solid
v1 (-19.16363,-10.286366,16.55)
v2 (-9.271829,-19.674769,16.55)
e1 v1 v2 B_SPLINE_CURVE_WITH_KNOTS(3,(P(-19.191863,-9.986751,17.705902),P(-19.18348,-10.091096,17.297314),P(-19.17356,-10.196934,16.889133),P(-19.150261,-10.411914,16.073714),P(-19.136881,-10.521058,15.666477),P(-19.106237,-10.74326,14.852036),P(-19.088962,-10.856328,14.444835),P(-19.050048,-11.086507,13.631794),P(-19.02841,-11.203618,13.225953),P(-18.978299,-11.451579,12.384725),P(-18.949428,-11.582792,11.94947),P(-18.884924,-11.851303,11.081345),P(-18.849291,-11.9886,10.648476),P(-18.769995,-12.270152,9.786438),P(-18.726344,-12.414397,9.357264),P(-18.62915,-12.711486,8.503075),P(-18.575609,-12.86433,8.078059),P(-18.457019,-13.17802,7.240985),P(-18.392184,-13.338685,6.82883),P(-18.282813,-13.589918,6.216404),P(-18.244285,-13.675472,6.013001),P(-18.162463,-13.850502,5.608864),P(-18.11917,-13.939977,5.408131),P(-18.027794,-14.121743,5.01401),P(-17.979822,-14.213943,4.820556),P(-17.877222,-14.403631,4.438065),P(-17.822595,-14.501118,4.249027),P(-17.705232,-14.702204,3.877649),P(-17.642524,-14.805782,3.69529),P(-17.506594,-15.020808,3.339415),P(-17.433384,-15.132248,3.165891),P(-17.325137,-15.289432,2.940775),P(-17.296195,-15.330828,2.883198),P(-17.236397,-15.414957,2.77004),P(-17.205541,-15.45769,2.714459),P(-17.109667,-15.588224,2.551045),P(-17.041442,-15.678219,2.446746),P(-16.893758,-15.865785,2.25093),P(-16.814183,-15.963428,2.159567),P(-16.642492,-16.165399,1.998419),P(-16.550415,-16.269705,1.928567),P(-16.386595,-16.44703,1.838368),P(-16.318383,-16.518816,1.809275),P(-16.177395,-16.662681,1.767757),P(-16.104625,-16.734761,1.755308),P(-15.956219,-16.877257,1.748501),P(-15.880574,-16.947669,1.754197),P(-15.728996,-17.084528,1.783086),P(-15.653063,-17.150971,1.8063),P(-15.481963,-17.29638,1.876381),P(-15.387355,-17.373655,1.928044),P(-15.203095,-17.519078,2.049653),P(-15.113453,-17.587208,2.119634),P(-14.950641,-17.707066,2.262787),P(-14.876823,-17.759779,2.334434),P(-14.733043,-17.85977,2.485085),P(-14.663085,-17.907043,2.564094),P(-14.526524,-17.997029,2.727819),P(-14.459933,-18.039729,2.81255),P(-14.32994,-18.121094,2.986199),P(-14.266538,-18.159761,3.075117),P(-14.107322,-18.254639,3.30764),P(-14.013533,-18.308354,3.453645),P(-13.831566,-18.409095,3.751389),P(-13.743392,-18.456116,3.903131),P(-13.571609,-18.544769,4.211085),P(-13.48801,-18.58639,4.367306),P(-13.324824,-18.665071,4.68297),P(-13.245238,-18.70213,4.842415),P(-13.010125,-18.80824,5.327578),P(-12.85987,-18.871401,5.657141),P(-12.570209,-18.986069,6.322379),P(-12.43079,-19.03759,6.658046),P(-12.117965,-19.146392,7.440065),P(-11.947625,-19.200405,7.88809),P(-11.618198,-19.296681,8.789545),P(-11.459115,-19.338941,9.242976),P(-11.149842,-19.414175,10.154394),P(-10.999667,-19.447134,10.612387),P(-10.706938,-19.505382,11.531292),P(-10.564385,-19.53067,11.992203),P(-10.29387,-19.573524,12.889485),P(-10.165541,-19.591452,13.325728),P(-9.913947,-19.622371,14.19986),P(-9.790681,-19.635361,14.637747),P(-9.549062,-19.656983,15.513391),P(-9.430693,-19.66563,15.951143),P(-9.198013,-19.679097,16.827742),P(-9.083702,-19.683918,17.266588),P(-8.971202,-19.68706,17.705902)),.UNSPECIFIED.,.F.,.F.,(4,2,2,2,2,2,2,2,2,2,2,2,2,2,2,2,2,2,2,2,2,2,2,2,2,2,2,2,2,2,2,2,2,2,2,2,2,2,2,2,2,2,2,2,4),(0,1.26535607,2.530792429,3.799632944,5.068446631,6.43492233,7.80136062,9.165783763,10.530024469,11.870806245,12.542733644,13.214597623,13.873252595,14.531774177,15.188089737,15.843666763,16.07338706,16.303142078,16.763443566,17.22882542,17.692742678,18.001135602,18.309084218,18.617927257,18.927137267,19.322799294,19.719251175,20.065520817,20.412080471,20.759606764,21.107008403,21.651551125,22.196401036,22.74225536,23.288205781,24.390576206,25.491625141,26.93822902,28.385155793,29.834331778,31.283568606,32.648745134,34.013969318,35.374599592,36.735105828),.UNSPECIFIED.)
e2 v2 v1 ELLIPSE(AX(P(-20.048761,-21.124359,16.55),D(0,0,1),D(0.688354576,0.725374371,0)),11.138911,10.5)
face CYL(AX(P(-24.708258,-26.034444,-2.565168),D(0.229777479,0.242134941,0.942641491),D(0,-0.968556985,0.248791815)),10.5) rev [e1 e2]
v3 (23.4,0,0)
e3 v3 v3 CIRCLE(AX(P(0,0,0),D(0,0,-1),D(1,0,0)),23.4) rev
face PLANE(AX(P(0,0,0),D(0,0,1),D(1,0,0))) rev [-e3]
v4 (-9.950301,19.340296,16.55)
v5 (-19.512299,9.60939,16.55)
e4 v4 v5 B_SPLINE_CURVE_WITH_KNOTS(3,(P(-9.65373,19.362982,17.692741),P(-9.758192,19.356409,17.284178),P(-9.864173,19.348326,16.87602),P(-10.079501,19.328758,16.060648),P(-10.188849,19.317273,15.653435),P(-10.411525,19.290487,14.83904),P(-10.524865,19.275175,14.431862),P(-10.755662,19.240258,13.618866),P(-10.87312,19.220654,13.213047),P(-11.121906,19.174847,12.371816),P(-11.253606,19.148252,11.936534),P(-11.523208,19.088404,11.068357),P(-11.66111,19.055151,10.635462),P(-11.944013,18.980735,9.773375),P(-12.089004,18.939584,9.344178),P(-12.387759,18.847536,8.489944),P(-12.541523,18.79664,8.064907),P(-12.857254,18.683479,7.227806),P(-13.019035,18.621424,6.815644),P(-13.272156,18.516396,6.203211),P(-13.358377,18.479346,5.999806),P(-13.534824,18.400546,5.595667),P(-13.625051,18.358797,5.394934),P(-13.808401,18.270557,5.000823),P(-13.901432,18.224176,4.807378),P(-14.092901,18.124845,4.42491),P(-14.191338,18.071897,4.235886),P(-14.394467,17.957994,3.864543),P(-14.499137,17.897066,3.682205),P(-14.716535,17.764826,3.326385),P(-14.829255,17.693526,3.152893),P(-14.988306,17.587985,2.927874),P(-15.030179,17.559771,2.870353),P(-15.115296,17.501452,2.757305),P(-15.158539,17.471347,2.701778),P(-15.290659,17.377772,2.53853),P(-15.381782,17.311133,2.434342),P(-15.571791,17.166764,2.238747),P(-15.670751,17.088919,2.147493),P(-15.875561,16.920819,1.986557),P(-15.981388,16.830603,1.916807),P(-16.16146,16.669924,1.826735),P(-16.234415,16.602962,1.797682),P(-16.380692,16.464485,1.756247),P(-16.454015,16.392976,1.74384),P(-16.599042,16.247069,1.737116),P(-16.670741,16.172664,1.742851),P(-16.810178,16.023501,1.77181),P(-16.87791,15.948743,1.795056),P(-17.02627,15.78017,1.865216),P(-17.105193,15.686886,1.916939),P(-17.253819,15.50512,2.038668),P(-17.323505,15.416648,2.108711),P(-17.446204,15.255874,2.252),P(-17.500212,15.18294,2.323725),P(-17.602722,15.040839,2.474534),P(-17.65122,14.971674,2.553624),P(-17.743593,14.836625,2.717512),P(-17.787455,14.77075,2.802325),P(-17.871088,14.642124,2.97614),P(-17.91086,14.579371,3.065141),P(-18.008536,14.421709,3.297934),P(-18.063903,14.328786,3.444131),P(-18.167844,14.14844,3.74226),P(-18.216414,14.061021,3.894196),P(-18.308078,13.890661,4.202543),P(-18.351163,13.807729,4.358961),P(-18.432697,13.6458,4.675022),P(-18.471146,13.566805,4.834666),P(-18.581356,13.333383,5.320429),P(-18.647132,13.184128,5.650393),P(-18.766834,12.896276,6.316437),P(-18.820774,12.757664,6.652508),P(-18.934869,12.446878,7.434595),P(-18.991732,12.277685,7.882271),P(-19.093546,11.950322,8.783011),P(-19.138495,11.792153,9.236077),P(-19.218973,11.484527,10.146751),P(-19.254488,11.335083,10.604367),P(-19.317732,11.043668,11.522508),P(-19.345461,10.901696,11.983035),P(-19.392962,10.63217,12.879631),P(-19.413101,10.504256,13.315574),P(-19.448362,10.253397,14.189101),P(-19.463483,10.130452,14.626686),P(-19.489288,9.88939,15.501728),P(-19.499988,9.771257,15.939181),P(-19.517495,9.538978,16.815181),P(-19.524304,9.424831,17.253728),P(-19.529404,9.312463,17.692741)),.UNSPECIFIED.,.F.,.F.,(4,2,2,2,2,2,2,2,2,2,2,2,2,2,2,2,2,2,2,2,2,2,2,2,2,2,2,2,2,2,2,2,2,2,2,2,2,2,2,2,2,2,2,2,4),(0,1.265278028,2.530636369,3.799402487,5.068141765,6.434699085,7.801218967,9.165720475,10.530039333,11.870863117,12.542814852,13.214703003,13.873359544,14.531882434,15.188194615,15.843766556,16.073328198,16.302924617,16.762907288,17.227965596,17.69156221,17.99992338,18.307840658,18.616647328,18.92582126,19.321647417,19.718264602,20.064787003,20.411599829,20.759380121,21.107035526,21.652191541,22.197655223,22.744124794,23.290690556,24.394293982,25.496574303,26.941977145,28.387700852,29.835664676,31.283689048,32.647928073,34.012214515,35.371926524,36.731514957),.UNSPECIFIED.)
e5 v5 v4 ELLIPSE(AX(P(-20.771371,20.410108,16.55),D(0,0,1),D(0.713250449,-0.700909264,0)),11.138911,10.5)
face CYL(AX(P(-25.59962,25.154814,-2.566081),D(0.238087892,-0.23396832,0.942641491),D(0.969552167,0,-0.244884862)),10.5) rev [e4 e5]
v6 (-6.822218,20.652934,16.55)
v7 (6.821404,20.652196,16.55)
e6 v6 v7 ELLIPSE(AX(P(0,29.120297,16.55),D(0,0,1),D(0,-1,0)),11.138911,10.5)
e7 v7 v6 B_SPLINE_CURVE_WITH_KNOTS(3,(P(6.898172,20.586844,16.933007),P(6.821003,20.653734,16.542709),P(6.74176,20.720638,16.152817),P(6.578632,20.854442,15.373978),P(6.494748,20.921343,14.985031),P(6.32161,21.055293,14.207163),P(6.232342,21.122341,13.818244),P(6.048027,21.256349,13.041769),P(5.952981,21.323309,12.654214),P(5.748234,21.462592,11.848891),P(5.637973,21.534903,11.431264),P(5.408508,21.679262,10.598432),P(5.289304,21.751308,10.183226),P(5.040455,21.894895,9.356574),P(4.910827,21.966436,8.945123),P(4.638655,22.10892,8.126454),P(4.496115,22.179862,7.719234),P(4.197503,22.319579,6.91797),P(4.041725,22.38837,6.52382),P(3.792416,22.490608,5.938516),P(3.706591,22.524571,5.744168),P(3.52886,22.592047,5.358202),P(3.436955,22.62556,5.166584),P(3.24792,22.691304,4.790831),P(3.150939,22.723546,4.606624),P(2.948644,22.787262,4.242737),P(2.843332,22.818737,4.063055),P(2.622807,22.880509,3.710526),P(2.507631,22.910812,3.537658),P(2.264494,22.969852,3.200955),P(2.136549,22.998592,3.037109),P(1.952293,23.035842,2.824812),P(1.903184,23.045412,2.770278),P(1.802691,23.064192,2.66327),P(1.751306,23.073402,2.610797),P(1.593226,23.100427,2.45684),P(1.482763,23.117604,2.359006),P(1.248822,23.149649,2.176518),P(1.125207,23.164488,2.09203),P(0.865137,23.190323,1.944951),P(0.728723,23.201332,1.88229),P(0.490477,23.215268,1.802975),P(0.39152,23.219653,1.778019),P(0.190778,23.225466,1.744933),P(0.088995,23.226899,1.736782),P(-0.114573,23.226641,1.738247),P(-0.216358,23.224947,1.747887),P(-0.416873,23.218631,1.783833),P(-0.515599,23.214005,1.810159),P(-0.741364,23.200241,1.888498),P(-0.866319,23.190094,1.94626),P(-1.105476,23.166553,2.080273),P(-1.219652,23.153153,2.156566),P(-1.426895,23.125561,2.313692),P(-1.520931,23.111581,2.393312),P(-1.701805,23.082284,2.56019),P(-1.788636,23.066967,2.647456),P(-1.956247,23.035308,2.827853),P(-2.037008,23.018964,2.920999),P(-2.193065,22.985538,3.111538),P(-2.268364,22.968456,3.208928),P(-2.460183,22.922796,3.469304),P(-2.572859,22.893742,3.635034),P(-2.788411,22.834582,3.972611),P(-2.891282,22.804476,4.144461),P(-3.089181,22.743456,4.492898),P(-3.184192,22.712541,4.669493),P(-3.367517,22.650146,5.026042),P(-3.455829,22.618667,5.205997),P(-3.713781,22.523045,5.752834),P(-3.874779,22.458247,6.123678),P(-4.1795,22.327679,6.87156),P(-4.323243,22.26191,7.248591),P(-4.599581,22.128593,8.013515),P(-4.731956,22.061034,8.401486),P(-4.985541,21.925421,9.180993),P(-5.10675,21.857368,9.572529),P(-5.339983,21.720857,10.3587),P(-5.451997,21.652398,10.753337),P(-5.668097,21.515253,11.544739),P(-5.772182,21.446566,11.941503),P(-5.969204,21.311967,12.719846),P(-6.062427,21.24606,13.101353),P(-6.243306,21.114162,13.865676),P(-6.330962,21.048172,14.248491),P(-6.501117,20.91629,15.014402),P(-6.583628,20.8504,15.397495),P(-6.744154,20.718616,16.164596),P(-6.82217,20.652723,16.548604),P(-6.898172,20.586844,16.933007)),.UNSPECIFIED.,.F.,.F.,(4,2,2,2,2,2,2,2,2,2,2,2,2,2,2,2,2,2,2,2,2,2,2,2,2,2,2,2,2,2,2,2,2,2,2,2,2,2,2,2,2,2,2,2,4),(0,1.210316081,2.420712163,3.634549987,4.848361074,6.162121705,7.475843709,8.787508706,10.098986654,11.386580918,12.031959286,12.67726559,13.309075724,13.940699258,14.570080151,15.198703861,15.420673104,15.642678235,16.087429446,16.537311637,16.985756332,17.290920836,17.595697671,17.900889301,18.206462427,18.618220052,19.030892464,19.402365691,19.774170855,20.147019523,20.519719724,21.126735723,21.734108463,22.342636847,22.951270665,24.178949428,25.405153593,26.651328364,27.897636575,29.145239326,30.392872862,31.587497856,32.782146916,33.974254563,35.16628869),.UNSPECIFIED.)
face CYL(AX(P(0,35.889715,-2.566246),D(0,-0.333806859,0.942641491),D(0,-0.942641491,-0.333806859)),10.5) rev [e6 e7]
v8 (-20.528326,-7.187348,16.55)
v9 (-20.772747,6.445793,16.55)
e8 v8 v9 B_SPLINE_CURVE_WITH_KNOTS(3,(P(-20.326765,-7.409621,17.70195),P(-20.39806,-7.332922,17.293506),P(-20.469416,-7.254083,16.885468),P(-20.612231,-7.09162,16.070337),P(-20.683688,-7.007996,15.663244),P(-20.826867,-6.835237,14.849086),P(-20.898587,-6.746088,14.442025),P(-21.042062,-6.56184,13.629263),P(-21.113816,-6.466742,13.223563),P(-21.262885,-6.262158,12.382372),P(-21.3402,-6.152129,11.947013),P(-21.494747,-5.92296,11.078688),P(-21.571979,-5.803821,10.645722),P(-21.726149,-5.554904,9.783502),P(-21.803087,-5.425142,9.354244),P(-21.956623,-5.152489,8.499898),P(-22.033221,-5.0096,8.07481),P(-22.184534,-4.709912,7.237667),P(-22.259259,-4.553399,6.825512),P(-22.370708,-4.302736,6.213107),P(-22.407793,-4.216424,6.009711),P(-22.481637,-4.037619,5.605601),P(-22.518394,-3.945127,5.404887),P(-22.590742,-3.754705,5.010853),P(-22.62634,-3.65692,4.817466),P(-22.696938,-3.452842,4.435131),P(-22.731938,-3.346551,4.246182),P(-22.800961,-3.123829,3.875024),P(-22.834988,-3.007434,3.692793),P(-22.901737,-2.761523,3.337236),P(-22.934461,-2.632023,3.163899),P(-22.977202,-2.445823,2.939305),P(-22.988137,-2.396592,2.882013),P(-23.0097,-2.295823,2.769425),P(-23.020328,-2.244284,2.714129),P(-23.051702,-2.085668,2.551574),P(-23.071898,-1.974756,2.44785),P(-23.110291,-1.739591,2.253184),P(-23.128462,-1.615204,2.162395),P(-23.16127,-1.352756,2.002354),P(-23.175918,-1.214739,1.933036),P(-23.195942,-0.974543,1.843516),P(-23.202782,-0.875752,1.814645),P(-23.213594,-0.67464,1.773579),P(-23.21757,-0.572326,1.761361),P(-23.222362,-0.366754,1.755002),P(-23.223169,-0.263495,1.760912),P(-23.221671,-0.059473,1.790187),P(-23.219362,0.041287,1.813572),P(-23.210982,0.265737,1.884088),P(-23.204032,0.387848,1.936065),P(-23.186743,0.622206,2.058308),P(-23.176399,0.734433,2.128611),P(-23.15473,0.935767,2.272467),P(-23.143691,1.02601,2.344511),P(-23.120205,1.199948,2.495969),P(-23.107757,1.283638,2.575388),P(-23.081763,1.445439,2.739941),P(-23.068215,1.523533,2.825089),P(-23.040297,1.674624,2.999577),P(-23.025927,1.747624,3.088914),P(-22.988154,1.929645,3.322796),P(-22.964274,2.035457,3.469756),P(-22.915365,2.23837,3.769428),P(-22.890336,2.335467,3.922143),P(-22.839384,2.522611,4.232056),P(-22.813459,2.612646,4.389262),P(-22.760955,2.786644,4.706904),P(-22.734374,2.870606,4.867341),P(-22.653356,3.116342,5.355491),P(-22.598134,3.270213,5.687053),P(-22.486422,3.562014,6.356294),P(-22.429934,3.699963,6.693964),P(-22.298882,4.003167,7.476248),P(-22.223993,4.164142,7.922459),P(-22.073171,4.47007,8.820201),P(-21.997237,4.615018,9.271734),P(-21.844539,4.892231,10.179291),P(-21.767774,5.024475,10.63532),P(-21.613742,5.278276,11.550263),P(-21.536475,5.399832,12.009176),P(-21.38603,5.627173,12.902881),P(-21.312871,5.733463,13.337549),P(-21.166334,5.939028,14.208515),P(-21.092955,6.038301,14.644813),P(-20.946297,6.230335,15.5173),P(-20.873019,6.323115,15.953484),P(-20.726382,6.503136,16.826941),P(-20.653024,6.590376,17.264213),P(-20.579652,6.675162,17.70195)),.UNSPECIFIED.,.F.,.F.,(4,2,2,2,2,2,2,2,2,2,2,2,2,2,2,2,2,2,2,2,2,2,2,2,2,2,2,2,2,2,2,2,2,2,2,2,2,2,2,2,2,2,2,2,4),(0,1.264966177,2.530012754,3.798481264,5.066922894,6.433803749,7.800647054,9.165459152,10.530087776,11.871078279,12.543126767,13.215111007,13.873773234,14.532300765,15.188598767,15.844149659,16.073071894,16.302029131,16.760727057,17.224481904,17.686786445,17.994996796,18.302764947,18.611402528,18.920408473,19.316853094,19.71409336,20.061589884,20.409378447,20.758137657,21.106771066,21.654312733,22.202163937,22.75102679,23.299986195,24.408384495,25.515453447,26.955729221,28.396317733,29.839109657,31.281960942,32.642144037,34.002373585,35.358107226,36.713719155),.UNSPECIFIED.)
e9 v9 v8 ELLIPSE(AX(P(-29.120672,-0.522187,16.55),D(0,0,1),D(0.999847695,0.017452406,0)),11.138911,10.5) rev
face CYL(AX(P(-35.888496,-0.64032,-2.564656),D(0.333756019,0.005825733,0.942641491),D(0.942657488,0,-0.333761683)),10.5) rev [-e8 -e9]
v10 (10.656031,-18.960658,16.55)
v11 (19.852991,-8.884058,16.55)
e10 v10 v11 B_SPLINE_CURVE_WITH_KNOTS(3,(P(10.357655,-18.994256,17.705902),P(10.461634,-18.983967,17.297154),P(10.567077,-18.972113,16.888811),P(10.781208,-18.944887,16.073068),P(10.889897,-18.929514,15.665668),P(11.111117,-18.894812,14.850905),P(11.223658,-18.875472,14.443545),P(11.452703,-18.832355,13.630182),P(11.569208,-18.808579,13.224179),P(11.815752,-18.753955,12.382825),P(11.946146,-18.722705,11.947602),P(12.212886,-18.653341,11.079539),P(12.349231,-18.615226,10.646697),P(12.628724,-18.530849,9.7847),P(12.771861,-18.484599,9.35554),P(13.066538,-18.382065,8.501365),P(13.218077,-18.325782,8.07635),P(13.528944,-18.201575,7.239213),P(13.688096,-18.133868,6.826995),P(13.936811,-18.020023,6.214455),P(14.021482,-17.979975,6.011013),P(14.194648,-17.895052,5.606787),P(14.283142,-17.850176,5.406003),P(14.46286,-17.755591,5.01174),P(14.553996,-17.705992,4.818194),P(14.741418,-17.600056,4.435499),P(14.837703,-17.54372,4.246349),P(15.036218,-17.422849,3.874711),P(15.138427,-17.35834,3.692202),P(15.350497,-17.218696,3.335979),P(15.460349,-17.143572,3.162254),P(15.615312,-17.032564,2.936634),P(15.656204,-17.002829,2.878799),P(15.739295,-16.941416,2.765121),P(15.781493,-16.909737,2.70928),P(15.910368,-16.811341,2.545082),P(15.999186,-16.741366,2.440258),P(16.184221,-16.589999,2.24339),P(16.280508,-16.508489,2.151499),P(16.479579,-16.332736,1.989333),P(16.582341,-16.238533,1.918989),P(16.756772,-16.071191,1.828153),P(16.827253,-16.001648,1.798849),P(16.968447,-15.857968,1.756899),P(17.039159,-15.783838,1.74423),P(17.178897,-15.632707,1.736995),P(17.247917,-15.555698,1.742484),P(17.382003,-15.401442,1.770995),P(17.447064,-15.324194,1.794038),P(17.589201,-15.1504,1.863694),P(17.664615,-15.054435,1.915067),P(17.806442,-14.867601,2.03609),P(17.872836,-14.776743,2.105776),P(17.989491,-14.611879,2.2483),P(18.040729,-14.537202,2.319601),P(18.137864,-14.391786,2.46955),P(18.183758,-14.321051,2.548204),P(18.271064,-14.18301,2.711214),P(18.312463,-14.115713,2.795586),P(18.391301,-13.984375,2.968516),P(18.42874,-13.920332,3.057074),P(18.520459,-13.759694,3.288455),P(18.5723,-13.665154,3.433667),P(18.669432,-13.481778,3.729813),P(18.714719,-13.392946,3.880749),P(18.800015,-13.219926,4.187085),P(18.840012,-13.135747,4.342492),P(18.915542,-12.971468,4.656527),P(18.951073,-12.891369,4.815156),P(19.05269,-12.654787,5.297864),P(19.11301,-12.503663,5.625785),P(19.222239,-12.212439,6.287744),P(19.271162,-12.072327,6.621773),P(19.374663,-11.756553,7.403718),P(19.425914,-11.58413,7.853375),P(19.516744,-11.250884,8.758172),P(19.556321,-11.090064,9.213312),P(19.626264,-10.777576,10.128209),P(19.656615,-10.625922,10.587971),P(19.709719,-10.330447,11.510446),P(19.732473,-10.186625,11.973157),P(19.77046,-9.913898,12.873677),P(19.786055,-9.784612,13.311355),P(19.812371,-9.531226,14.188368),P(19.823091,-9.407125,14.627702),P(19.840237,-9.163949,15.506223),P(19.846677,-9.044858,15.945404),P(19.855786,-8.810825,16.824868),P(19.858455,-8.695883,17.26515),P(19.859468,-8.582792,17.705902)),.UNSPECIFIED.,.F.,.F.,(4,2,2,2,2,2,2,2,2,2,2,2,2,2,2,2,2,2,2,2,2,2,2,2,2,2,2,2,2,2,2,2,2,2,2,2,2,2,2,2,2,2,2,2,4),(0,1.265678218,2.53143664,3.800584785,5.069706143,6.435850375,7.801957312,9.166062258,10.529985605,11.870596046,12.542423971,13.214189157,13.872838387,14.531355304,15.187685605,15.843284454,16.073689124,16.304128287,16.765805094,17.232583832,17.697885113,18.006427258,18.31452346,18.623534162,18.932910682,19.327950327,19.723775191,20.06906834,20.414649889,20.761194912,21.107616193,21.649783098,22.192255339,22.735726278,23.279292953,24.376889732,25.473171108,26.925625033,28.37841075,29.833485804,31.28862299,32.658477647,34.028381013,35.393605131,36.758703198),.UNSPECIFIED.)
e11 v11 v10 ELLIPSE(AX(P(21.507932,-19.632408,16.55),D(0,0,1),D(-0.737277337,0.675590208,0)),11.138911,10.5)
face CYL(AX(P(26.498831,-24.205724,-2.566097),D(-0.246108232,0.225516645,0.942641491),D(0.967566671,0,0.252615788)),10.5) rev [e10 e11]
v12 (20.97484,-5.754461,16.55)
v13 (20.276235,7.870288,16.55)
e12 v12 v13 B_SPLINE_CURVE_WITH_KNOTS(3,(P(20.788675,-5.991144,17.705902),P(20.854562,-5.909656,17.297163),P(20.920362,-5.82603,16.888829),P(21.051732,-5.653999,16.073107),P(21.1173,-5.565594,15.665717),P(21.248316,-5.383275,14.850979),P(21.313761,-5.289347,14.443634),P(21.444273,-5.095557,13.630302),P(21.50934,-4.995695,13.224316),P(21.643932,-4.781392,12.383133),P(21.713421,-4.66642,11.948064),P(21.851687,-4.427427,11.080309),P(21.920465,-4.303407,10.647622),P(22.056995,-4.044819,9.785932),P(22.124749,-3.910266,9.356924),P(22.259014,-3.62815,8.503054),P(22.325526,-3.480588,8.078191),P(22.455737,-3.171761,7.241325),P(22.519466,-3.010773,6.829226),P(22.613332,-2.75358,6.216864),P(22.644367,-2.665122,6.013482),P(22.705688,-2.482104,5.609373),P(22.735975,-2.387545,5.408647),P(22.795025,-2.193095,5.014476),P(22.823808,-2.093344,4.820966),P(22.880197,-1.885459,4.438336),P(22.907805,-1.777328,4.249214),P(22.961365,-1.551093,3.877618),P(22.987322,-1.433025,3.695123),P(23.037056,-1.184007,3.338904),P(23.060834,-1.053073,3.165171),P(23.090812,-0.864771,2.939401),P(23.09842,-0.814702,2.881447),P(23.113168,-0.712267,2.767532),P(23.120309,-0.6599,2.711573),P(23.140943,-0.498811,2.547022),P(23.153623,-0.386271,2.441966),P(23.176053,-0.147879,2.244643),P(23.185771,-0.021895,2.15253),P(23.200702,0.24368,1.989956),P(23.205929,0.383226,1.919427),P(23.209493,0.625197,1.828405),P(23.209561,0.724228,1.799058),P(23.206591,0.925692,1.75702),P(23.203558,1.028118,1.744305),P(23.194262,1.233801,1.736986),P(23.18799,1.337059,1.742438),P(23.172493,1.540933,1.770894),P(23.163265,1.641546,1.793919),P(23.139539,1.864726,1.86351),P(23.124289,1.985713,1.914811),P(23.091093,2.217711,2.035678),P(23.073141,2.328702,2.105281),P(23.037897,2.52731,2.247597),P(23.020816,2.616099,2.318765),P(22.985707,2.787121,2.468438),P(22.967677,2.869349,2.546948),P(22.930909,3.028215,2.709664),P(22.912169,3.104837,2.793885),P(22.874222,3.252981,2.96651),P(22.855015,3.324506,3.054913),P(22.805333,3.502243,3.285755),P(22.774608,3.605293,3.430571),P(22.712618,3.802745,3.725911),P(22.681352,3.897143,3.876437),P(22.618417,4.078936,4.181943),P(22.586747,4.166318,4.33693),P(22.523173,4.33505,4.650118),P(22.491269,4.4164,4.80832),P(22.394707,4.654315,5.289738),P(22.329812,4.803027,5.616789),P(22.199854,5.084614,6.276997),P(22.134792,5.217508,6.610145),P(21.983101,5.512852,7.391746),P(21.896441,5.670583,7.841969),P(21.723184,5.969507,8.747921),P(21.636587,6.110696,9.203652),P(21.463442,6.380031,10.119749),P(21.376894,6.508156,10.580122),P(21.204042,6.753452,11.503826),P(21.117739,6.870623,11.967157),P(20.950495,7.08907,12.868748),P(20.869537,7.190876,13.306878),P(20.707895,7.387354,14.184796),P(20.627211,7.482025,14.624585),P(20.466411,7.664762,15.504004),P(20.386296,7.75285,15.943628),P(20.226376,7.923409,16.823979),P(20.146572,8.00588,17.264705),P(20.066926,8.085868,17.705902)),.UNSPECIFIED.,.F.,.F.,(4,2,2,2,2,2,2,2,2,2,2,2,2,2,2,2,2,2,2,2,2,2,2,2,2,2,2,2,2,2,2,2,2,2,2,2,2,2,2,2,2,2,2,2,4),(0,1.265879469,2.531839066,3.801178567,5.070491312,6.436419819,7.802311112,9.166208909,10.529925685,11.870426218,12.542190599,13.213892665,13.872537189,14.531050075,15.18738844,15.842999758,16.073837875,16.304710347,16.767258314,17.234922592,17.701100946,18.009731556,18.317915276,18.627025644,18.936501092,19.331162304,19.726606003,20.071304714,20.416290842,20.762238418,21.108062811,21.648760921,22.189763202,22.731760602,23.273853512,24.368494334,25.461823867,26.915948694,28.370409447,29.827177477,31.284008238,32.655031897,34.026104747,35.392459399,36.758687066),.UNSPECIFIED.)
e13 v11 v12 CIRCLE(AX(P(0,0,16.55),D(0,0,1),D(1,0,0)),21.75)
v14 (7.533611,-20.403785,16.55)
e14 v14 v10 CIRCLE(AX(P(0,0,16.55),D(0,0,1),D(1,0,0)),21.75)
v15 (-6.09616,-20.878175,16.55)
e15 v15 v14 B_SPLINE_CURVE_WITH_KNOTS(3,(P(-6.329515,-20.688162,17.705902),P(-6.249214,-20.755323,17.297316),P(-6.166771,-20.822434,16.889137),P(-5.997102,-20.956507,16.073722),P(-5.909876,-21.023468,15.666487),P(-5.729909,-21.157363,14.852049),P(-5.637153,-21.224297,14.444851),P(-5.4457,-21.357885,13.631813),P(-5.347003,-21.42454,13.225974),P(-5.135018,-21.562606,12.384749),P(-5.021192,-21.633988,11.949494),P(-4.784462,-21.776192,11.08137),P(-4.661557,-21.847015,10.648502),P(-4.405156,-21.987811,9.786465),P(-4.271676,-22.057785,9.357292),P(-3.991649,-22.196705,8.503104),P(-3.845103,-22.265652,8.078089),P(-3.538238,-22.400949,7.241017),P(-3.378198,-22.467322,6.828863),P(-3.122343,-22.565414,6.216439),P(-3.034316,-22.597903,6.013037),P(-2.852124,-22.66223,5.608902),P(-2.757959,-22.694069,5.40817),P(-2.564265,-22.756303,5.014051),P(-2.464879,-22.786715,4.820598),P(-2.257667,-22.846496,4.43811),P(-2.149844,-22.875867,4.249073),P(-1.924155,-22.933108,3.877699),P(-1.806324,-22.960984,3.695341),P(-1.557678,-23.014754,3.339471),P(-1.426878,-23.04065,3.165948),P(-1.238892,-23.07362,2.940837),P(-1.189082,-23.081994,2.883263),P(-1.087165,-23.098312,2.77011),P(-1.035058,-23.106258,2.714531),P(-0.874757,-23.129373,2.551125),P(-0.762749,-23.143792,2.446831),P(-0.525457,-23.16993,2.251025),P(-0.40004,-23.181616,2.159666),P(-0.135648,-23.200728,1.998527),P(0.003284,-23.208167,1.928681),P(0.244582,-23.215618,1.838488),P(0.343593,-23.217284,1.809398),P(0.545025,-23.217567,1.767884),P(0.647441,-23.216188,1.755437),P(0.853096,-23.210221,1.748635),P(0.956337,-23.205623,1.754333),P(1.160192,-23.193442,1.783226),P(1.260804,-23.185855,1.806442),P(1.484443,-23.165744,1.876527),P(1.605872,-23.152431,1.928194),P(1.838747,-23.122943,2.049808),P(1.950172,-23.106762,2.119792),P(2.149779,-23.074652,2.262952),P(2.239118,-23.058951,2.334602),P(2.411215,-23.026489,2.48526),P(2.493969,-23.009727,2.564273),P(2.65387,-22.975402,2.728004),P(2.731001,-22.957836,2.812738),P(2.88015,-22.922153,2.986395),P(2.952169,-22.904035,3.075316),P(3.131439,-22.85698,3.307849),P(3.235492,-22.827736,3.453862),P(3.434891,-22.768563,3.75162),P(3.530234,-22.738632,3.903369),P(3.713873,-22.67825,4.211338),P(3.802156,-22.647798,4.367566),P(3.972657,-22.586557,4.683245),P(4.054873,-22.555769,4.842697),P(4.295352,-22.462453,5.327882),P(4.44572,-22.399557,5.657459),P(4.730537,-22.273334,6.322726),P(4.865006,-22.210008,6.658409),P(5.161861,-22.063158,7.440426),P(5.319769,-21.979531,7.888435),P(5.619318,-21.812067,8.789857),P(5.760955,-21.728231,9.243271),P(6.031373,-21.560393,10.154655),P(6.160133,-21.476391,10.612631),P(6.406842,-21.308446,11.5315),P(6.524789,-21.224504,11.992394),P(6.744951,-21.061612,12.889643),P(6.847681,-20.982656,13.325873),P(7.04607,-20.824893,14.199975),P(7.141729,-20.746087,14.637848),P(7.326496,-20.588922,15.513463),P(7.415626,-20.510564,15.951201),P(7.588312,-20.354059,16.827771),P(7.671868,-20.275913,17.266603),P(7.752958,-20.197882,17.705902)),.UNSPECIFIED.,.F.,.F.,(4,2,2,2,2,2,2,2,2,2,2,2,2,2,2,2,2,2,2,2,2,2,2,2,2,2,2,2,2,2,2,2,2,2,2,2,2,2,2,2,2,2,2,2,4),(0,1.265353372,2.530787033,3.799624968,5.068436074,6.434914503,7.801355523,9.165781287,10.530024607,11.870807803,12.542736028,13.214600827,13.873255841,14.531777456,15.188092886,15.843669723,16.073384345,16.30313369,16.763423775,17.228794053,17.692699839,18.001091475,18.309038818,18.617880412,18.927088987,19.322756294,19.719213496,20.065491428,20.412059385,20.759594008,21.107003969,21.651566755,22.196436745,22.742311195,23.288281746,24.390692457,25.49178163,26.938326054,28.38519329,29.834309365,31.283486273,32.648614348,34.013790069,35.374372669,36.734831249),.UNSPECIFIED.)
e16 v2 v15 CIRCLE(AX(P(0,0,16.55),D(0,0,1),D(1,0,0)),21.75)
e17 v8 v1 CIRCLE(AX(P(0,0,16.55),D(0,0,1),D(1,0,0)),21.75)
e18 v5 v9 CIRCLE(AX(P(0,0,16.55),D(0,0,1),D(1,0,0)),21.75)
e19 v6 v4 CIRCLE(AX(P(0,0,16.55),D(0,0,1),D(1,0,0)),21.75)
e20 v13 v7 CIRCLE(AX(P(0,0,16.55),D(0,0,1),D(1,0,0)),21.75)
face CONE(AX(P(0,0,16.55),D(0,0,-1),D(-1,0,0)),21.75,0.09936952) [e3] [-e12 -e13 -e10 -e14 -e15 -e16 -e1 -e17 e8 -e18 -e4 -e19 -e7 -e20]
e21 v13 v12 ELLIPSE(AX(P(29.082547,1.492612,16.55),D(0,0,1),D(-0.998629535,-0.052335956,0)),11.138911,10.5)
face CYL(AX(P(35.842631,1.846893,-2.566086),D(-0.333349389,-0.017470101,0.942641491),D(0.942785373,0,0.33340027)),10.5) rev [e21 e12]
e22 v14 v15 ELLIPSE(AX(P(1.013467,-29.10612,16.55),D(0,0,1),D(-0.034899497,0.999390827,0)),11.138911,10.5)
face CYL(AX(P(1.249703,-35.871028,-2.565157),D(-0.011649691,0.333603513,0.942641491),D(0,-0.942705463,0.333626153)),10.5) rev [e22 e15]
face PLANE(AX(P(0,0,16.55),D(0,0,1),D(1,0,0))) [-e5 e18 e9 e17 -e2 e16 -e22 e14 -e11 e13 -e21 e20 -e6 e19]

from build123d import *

# Parameters (mm, degrees)
REVOLVE1_ANGLE     = 19.5
CUT_EXTRUDE3_DEPTH = 30
REVOLVE2_ANGLE     = 19.5
CUT_EXTRUDE4_DEPTH = 30
REVOLVE3_ANGLE     = 19.5
CUT_EXTRUDE5_DEPTH = 30
REVOLVE4_ANGLE     = 19.5
CUT_EXTRUDE6_DEPTH = 30
REVOLVE5_ANGLE     = 19.5
CUT_EXTRUDE7_DEPTH = 30
REVOLVE6_ANGLE     = 19.5
CUT_EXTRUDE8_DEPTH = 30
REVOLVE7_ANGLE     = 19.5
CUT_EXTRUDE9_DEPTH = 30


# Read off the part's stored shape, not the designer's step: Boundary1
with BuildPart() as part:
    # Boundary1 outline → Boundary1 (revolve)
    with BuildSketch(Plane.XZ):
        Polygon((23.4, 0), (21.75, 16.55), (0, 16.55), (0, 0), align=None)
    revolve(axis=Axis((0, 0, 0), (0, 0, 1)))

    # Sketch3 → Revolve1 (revolve)
    with BuildSketch(Plane.XY.offset(16.55)):
        with BuildLine():
            ThreePointArc((6.7, 20.692329497), (0, 21.75), (-6.7, 20.692329497))
            ThreePointArc((-6.7, 20.692329497), (0, 18.897069907), (6.7, 20.692329497))
        make_face()
    revolve(axis=Axis((-21.75, 0, 16.55), (1, 0, 0)), revolution_arc=REVOLVE1_ANGLE)

    # Sketch21 → Cut-Extrude3 (cut)
    # profile 1 of 2: a face of its own
    with BuildSketch(Plane(origin=(0, -5.207626236, 14.705882831), x_dir=(1, 0, 0), z_dir=(0, -0.3338068592337716, 0.9426414910921781))):
        with BuildLine():
            Line((9.372530559, 28.241040631), (-9.372530559, 28.241040631))
            ThreePointArc((-9.372530559, 28.241040631), (0, 22.47450352), (9.372530559, 28.241040631))
        make_face()
        with BuildLine():
            ThreePointArc((6.7, 26.216833017), (0, 24.421573428), (-6.7, 26.216833017))
            ThreePointArc((-6.7, 26.216833017), (0, 27.27450352), (6.7, 26.216833017))
        make_face(mode=Mode.SUBTRACT)
    # profile 2 of 2: a face of its own
    with BuildSketch(Plane(origin=(0, -5.207626236, 14.705882831), x_dir=(1, 0, 0), z_dir=(0, -0.3338068592337716, 0.9426414910921781))):
        with BuildLine():
            ThreePointArc((6.7, 26.216833017), (0, 27.27450352), (-6.7, 26.216833017))
            ThreePointArc((-6.7, 26.216833017), (0, 24.421573428), (6.7, 26.216833017))
        make_face()
    extrude(amount=-CUT_EXTRUDE3_DEPTH, mode=Mode.SUBTRACT)

    # Sketch22 → Revolve2 (revolve)
    with BuildSketch(Plane.XY.offset(16.55)):
        with BuildLine():
            ThreePointArc((-19.454905378, 9.724667435), (-15.513197269, 15.244776499), (-10.062721237, 19.282223454))
            ThreePointArc((-10.062721237, 19.282223454), (-13.478343599, 13.245131366), (-19.454905378, 9.724667435))
        make_face()
    revolve(axis=Axis((-15.244776499, -15.513197269, 16.55), (0.7009092642998491, 0.7132504491541835, 0)), revolution_arc=REVOLVE2_ANGLE)

    # Sketch24 → Cut-Extrude4 (cut)
    with BuildSketch(Plane(origin=(3.714341752, -3.650073474, 14.705882831), x_dir=(0.971243492060928, 0.05687022863046558, -0.23119657485527895), z_dir=(0.23808789227923496, -0.23396832012378627, 0.9426414910921782))):
        with BuildLine():
            Line((-27.491870021, 14.371370891), (-13.585471932, 28.745378411))
            ThreePointArc((-13.585471932, 28.745378411), (-15.293280927, 16.483625521), (-27.491870021, 14.371370891))
        make_face()
    extrude(amount=-CUT_EXTRUDE4_DEPTH, mode=Mode.SUBTRACT)

    # Sketch25 → Revolve3 (revolve)
    with BuildSketch(Plane.XY.offset(16.55)):
        with BuildLine():
            ThreePointArc((-20.571898581, -7.061125177), (-21.74668737, -0.37958984), (-20.805796451, 6.338874823))
            ThreePointArc((-20.805796451, 6.338874823), (-18.893272141, -0.329783292), (-20.571898581, -7.061125177))
        make_face()
    revolve(axis=Axis((0.37958984, -21.74668737, 16.55), (-0.017452406437287054, 0.9998476951563913, 0)), revolution_arc=REVOLVE3_ANGLE)

    # Sketch26 → Cut-Extrude5 (cut)
    with BuildSketch(Plane(origin=(5.206833089, 0.09088561, 14.705882831), x_dir=(0.9426574907513692, -0.004123731024087582, -0.3337361981757048), z_dir=(0.33375601883228045, 0.00582573297890205, 0.9426414910921782))):
        with BuildLine():
            Line((-29.354887322, 9.164887842), (-30.256162535, -10.835112158))
            ThreePointArc((-30.256162535, -10.835112158), (-22.482645188, -1.165108658), (-29.354887322, 9.164887842))
        make_face()
    extrude(amount=-CUT_EXTRUDE5_DEPTH, mode=Mode.SUBTRACT)

    # Sketch27 → Revolve4 (revolve)
    with BuildSketch(Plane.XY.offset(16.55)):
        with BuildLine():
            ThreePointArc((-19.103667977, -10.397709836), (-14.971712021, -15.77689257), (-9.383651405, -19.621661151))
            ThreePointArc((-9.383651405, -19.621661151), (-13.007884538, -13.707450198), (-19.103667977, -10.397709836))
        make_face()
    revolve(axis=Axis((15.77689257, -14.971712021, 16.55), (-0.7253743710122916, 0.6883545756937498, 0)), revolution_arc=REVOLVE4_ANGLE)

    # Sketch28 → Cut-Extrude6 (cut)
    with BuildSketch(Plane(origin=(3.584693348, 3.777478605, 14.705882831), x_dir=(0.9732423250057362, -0.05845929079288866, -0.22222035941250265), z_dir=(0.2297774789515262, 0.24213494055628595, 0.9426414910921781))):
        with BuildLine():
            Line((-26.325903264, -15.059910067), (-12.852307992, -29.840377936))
            ThreePointArc((-12.852307992, -29.840377936), (-14.195389298, -17.533334095), (-26.325903264, -15.059910067))
        make_face()
    extrude(amount=-CUT_EXTRUDE6_DEPTH, mode=Mode.SUBTRACT)

    # Sketch29 → Revolve5 (revolve)
    with BuildSketch(Plane.XY.offset(16.55)):
        with BuildLine():
            ThreePointArc((-5.973766656, -20.913550917), (0.759064053, -21.736750488), (7.418070426, -20.445897661))
            ThreePointArc((7.418070426, -20.445897661), (0.659498229, -18.885558323), (-5.973766656, -20.913550917))
        make_face()
    revolve(axis=Axis((21.736750488, 0.759064053, 16.55), (-0.9993908270190959, -0.03489949670249739, 0)), revolution_arc=REVOLVE5_ANGLE)

    # Sketch30 → Cut-Extrude7 (cut)
    with BuildSketch(Plane(origin=(-0.181743535, 5.204453891, 14.705882831), x_dir=(0.9999321399924122, 0.0038771729275817748, 0.01098557874146117), z_dir=(-0.011649691383100024, 0.33360351311428743, 0.9426414910921777))):
        with BuildLine():
            Line((-9.086281711, -30.342992304), (10.880145152, -29.184632107))
            ThreePointArc((10.880145152, -29.184632107), (0.474220724, -22.477625897), (-9.086281711, -30.342992304))
        make_face()
    extrude(amount=-CUT_EXTRUDE7_DEPTH, mode=Mode.SUBTRACT)

    # Sketch31 → Revolve6 (revolve)
    with BuildSketch(Plane.XY.offset(16.55)):
        with BuildLine():
            ThreePointArc((19.782439975, -9.039777024), (16.035782076, -14.694087016), (10.729531193, -18.919293337))
            ThreePointArc((10.729531193, -18.919293337), (13.932381375, -12.766675382), (19.782439975, -9.039777024))
        make_face()
    revolve(axis=Axis((14.694087016, 16.035782076, 16.55), (-0.675590207615664, -0.7372773368101205, 0)), revolution_arc=REVOLVE6_ANGLE)

    # Sketch32 → Cut-Extrude8 (cut)
    with BuildSketch(Plane(origin=(-3.839464802, 3.51822129, 14.705882831), x_dir=(0.9692386501510535, 0.054574384261441185, 0.23999599087453166), z_dir=(-0.2461082321848259, 0.22551664533327645, 0.9426414910921782))):
        with BuildLine():
            Line((15.221586992, -29.008248881), (27.126990078, -12.937736215))
            ThreePointArc((27.126990078, -12.937736215), (15.309806614, -16.628450305), (15.221586992, -29.008248881))
        make_face()
    extrude(amount=-CUT_EXTRUDE8_DEPTH, mode=Mode.SUBTRACT)

    # Sketch33 → Revolve7 (revolve)
    with BuildSketch(Plane.XY.offset(16.55)):
        with BuildLine():
            ThreePointArc((20.313320471, 7.773770734), (21.720192381, 1.138307048), (21.014622285, -5.607865032))
            ThreePointArc((21.014622285, -5.607865032), (18.87117213, 0.988996224), (20.313320471, 7.773770734))
        make_face()
    revolve(axis=Axis((-1.138307048, 21.720192381, 16.55), (0.052335956242940865, -0.998629534754574, 0)), revolution_arc=REVOLVE7_ANGLE)

    # Sketch34 → Cut-Extrude9 (cut)
    with BuildSketch(Plane(origin=(-5.200489365, -0.272546099, 14.705882831), x_dir=(0.9427855723268154, -0.012319387513152558, 0.3331720235909673), z_dir=(-0.33334938853450696, -0.01747010117845218, 0.9426414910921781))):
        with BuildLine():
            Line((28.876049562, 11.693707416), (30.572326937, -8.234228831))
            ThreePointArc((30.572326937, -8.234228831), (22.452048009, 1.11073054), (28.876049562, 11.693707416))
        make_face()
    extrude(amount=-CUT_EXTRUDE9_DEPTH, mode=Mode.SUBTRACT)


solid = part.part
